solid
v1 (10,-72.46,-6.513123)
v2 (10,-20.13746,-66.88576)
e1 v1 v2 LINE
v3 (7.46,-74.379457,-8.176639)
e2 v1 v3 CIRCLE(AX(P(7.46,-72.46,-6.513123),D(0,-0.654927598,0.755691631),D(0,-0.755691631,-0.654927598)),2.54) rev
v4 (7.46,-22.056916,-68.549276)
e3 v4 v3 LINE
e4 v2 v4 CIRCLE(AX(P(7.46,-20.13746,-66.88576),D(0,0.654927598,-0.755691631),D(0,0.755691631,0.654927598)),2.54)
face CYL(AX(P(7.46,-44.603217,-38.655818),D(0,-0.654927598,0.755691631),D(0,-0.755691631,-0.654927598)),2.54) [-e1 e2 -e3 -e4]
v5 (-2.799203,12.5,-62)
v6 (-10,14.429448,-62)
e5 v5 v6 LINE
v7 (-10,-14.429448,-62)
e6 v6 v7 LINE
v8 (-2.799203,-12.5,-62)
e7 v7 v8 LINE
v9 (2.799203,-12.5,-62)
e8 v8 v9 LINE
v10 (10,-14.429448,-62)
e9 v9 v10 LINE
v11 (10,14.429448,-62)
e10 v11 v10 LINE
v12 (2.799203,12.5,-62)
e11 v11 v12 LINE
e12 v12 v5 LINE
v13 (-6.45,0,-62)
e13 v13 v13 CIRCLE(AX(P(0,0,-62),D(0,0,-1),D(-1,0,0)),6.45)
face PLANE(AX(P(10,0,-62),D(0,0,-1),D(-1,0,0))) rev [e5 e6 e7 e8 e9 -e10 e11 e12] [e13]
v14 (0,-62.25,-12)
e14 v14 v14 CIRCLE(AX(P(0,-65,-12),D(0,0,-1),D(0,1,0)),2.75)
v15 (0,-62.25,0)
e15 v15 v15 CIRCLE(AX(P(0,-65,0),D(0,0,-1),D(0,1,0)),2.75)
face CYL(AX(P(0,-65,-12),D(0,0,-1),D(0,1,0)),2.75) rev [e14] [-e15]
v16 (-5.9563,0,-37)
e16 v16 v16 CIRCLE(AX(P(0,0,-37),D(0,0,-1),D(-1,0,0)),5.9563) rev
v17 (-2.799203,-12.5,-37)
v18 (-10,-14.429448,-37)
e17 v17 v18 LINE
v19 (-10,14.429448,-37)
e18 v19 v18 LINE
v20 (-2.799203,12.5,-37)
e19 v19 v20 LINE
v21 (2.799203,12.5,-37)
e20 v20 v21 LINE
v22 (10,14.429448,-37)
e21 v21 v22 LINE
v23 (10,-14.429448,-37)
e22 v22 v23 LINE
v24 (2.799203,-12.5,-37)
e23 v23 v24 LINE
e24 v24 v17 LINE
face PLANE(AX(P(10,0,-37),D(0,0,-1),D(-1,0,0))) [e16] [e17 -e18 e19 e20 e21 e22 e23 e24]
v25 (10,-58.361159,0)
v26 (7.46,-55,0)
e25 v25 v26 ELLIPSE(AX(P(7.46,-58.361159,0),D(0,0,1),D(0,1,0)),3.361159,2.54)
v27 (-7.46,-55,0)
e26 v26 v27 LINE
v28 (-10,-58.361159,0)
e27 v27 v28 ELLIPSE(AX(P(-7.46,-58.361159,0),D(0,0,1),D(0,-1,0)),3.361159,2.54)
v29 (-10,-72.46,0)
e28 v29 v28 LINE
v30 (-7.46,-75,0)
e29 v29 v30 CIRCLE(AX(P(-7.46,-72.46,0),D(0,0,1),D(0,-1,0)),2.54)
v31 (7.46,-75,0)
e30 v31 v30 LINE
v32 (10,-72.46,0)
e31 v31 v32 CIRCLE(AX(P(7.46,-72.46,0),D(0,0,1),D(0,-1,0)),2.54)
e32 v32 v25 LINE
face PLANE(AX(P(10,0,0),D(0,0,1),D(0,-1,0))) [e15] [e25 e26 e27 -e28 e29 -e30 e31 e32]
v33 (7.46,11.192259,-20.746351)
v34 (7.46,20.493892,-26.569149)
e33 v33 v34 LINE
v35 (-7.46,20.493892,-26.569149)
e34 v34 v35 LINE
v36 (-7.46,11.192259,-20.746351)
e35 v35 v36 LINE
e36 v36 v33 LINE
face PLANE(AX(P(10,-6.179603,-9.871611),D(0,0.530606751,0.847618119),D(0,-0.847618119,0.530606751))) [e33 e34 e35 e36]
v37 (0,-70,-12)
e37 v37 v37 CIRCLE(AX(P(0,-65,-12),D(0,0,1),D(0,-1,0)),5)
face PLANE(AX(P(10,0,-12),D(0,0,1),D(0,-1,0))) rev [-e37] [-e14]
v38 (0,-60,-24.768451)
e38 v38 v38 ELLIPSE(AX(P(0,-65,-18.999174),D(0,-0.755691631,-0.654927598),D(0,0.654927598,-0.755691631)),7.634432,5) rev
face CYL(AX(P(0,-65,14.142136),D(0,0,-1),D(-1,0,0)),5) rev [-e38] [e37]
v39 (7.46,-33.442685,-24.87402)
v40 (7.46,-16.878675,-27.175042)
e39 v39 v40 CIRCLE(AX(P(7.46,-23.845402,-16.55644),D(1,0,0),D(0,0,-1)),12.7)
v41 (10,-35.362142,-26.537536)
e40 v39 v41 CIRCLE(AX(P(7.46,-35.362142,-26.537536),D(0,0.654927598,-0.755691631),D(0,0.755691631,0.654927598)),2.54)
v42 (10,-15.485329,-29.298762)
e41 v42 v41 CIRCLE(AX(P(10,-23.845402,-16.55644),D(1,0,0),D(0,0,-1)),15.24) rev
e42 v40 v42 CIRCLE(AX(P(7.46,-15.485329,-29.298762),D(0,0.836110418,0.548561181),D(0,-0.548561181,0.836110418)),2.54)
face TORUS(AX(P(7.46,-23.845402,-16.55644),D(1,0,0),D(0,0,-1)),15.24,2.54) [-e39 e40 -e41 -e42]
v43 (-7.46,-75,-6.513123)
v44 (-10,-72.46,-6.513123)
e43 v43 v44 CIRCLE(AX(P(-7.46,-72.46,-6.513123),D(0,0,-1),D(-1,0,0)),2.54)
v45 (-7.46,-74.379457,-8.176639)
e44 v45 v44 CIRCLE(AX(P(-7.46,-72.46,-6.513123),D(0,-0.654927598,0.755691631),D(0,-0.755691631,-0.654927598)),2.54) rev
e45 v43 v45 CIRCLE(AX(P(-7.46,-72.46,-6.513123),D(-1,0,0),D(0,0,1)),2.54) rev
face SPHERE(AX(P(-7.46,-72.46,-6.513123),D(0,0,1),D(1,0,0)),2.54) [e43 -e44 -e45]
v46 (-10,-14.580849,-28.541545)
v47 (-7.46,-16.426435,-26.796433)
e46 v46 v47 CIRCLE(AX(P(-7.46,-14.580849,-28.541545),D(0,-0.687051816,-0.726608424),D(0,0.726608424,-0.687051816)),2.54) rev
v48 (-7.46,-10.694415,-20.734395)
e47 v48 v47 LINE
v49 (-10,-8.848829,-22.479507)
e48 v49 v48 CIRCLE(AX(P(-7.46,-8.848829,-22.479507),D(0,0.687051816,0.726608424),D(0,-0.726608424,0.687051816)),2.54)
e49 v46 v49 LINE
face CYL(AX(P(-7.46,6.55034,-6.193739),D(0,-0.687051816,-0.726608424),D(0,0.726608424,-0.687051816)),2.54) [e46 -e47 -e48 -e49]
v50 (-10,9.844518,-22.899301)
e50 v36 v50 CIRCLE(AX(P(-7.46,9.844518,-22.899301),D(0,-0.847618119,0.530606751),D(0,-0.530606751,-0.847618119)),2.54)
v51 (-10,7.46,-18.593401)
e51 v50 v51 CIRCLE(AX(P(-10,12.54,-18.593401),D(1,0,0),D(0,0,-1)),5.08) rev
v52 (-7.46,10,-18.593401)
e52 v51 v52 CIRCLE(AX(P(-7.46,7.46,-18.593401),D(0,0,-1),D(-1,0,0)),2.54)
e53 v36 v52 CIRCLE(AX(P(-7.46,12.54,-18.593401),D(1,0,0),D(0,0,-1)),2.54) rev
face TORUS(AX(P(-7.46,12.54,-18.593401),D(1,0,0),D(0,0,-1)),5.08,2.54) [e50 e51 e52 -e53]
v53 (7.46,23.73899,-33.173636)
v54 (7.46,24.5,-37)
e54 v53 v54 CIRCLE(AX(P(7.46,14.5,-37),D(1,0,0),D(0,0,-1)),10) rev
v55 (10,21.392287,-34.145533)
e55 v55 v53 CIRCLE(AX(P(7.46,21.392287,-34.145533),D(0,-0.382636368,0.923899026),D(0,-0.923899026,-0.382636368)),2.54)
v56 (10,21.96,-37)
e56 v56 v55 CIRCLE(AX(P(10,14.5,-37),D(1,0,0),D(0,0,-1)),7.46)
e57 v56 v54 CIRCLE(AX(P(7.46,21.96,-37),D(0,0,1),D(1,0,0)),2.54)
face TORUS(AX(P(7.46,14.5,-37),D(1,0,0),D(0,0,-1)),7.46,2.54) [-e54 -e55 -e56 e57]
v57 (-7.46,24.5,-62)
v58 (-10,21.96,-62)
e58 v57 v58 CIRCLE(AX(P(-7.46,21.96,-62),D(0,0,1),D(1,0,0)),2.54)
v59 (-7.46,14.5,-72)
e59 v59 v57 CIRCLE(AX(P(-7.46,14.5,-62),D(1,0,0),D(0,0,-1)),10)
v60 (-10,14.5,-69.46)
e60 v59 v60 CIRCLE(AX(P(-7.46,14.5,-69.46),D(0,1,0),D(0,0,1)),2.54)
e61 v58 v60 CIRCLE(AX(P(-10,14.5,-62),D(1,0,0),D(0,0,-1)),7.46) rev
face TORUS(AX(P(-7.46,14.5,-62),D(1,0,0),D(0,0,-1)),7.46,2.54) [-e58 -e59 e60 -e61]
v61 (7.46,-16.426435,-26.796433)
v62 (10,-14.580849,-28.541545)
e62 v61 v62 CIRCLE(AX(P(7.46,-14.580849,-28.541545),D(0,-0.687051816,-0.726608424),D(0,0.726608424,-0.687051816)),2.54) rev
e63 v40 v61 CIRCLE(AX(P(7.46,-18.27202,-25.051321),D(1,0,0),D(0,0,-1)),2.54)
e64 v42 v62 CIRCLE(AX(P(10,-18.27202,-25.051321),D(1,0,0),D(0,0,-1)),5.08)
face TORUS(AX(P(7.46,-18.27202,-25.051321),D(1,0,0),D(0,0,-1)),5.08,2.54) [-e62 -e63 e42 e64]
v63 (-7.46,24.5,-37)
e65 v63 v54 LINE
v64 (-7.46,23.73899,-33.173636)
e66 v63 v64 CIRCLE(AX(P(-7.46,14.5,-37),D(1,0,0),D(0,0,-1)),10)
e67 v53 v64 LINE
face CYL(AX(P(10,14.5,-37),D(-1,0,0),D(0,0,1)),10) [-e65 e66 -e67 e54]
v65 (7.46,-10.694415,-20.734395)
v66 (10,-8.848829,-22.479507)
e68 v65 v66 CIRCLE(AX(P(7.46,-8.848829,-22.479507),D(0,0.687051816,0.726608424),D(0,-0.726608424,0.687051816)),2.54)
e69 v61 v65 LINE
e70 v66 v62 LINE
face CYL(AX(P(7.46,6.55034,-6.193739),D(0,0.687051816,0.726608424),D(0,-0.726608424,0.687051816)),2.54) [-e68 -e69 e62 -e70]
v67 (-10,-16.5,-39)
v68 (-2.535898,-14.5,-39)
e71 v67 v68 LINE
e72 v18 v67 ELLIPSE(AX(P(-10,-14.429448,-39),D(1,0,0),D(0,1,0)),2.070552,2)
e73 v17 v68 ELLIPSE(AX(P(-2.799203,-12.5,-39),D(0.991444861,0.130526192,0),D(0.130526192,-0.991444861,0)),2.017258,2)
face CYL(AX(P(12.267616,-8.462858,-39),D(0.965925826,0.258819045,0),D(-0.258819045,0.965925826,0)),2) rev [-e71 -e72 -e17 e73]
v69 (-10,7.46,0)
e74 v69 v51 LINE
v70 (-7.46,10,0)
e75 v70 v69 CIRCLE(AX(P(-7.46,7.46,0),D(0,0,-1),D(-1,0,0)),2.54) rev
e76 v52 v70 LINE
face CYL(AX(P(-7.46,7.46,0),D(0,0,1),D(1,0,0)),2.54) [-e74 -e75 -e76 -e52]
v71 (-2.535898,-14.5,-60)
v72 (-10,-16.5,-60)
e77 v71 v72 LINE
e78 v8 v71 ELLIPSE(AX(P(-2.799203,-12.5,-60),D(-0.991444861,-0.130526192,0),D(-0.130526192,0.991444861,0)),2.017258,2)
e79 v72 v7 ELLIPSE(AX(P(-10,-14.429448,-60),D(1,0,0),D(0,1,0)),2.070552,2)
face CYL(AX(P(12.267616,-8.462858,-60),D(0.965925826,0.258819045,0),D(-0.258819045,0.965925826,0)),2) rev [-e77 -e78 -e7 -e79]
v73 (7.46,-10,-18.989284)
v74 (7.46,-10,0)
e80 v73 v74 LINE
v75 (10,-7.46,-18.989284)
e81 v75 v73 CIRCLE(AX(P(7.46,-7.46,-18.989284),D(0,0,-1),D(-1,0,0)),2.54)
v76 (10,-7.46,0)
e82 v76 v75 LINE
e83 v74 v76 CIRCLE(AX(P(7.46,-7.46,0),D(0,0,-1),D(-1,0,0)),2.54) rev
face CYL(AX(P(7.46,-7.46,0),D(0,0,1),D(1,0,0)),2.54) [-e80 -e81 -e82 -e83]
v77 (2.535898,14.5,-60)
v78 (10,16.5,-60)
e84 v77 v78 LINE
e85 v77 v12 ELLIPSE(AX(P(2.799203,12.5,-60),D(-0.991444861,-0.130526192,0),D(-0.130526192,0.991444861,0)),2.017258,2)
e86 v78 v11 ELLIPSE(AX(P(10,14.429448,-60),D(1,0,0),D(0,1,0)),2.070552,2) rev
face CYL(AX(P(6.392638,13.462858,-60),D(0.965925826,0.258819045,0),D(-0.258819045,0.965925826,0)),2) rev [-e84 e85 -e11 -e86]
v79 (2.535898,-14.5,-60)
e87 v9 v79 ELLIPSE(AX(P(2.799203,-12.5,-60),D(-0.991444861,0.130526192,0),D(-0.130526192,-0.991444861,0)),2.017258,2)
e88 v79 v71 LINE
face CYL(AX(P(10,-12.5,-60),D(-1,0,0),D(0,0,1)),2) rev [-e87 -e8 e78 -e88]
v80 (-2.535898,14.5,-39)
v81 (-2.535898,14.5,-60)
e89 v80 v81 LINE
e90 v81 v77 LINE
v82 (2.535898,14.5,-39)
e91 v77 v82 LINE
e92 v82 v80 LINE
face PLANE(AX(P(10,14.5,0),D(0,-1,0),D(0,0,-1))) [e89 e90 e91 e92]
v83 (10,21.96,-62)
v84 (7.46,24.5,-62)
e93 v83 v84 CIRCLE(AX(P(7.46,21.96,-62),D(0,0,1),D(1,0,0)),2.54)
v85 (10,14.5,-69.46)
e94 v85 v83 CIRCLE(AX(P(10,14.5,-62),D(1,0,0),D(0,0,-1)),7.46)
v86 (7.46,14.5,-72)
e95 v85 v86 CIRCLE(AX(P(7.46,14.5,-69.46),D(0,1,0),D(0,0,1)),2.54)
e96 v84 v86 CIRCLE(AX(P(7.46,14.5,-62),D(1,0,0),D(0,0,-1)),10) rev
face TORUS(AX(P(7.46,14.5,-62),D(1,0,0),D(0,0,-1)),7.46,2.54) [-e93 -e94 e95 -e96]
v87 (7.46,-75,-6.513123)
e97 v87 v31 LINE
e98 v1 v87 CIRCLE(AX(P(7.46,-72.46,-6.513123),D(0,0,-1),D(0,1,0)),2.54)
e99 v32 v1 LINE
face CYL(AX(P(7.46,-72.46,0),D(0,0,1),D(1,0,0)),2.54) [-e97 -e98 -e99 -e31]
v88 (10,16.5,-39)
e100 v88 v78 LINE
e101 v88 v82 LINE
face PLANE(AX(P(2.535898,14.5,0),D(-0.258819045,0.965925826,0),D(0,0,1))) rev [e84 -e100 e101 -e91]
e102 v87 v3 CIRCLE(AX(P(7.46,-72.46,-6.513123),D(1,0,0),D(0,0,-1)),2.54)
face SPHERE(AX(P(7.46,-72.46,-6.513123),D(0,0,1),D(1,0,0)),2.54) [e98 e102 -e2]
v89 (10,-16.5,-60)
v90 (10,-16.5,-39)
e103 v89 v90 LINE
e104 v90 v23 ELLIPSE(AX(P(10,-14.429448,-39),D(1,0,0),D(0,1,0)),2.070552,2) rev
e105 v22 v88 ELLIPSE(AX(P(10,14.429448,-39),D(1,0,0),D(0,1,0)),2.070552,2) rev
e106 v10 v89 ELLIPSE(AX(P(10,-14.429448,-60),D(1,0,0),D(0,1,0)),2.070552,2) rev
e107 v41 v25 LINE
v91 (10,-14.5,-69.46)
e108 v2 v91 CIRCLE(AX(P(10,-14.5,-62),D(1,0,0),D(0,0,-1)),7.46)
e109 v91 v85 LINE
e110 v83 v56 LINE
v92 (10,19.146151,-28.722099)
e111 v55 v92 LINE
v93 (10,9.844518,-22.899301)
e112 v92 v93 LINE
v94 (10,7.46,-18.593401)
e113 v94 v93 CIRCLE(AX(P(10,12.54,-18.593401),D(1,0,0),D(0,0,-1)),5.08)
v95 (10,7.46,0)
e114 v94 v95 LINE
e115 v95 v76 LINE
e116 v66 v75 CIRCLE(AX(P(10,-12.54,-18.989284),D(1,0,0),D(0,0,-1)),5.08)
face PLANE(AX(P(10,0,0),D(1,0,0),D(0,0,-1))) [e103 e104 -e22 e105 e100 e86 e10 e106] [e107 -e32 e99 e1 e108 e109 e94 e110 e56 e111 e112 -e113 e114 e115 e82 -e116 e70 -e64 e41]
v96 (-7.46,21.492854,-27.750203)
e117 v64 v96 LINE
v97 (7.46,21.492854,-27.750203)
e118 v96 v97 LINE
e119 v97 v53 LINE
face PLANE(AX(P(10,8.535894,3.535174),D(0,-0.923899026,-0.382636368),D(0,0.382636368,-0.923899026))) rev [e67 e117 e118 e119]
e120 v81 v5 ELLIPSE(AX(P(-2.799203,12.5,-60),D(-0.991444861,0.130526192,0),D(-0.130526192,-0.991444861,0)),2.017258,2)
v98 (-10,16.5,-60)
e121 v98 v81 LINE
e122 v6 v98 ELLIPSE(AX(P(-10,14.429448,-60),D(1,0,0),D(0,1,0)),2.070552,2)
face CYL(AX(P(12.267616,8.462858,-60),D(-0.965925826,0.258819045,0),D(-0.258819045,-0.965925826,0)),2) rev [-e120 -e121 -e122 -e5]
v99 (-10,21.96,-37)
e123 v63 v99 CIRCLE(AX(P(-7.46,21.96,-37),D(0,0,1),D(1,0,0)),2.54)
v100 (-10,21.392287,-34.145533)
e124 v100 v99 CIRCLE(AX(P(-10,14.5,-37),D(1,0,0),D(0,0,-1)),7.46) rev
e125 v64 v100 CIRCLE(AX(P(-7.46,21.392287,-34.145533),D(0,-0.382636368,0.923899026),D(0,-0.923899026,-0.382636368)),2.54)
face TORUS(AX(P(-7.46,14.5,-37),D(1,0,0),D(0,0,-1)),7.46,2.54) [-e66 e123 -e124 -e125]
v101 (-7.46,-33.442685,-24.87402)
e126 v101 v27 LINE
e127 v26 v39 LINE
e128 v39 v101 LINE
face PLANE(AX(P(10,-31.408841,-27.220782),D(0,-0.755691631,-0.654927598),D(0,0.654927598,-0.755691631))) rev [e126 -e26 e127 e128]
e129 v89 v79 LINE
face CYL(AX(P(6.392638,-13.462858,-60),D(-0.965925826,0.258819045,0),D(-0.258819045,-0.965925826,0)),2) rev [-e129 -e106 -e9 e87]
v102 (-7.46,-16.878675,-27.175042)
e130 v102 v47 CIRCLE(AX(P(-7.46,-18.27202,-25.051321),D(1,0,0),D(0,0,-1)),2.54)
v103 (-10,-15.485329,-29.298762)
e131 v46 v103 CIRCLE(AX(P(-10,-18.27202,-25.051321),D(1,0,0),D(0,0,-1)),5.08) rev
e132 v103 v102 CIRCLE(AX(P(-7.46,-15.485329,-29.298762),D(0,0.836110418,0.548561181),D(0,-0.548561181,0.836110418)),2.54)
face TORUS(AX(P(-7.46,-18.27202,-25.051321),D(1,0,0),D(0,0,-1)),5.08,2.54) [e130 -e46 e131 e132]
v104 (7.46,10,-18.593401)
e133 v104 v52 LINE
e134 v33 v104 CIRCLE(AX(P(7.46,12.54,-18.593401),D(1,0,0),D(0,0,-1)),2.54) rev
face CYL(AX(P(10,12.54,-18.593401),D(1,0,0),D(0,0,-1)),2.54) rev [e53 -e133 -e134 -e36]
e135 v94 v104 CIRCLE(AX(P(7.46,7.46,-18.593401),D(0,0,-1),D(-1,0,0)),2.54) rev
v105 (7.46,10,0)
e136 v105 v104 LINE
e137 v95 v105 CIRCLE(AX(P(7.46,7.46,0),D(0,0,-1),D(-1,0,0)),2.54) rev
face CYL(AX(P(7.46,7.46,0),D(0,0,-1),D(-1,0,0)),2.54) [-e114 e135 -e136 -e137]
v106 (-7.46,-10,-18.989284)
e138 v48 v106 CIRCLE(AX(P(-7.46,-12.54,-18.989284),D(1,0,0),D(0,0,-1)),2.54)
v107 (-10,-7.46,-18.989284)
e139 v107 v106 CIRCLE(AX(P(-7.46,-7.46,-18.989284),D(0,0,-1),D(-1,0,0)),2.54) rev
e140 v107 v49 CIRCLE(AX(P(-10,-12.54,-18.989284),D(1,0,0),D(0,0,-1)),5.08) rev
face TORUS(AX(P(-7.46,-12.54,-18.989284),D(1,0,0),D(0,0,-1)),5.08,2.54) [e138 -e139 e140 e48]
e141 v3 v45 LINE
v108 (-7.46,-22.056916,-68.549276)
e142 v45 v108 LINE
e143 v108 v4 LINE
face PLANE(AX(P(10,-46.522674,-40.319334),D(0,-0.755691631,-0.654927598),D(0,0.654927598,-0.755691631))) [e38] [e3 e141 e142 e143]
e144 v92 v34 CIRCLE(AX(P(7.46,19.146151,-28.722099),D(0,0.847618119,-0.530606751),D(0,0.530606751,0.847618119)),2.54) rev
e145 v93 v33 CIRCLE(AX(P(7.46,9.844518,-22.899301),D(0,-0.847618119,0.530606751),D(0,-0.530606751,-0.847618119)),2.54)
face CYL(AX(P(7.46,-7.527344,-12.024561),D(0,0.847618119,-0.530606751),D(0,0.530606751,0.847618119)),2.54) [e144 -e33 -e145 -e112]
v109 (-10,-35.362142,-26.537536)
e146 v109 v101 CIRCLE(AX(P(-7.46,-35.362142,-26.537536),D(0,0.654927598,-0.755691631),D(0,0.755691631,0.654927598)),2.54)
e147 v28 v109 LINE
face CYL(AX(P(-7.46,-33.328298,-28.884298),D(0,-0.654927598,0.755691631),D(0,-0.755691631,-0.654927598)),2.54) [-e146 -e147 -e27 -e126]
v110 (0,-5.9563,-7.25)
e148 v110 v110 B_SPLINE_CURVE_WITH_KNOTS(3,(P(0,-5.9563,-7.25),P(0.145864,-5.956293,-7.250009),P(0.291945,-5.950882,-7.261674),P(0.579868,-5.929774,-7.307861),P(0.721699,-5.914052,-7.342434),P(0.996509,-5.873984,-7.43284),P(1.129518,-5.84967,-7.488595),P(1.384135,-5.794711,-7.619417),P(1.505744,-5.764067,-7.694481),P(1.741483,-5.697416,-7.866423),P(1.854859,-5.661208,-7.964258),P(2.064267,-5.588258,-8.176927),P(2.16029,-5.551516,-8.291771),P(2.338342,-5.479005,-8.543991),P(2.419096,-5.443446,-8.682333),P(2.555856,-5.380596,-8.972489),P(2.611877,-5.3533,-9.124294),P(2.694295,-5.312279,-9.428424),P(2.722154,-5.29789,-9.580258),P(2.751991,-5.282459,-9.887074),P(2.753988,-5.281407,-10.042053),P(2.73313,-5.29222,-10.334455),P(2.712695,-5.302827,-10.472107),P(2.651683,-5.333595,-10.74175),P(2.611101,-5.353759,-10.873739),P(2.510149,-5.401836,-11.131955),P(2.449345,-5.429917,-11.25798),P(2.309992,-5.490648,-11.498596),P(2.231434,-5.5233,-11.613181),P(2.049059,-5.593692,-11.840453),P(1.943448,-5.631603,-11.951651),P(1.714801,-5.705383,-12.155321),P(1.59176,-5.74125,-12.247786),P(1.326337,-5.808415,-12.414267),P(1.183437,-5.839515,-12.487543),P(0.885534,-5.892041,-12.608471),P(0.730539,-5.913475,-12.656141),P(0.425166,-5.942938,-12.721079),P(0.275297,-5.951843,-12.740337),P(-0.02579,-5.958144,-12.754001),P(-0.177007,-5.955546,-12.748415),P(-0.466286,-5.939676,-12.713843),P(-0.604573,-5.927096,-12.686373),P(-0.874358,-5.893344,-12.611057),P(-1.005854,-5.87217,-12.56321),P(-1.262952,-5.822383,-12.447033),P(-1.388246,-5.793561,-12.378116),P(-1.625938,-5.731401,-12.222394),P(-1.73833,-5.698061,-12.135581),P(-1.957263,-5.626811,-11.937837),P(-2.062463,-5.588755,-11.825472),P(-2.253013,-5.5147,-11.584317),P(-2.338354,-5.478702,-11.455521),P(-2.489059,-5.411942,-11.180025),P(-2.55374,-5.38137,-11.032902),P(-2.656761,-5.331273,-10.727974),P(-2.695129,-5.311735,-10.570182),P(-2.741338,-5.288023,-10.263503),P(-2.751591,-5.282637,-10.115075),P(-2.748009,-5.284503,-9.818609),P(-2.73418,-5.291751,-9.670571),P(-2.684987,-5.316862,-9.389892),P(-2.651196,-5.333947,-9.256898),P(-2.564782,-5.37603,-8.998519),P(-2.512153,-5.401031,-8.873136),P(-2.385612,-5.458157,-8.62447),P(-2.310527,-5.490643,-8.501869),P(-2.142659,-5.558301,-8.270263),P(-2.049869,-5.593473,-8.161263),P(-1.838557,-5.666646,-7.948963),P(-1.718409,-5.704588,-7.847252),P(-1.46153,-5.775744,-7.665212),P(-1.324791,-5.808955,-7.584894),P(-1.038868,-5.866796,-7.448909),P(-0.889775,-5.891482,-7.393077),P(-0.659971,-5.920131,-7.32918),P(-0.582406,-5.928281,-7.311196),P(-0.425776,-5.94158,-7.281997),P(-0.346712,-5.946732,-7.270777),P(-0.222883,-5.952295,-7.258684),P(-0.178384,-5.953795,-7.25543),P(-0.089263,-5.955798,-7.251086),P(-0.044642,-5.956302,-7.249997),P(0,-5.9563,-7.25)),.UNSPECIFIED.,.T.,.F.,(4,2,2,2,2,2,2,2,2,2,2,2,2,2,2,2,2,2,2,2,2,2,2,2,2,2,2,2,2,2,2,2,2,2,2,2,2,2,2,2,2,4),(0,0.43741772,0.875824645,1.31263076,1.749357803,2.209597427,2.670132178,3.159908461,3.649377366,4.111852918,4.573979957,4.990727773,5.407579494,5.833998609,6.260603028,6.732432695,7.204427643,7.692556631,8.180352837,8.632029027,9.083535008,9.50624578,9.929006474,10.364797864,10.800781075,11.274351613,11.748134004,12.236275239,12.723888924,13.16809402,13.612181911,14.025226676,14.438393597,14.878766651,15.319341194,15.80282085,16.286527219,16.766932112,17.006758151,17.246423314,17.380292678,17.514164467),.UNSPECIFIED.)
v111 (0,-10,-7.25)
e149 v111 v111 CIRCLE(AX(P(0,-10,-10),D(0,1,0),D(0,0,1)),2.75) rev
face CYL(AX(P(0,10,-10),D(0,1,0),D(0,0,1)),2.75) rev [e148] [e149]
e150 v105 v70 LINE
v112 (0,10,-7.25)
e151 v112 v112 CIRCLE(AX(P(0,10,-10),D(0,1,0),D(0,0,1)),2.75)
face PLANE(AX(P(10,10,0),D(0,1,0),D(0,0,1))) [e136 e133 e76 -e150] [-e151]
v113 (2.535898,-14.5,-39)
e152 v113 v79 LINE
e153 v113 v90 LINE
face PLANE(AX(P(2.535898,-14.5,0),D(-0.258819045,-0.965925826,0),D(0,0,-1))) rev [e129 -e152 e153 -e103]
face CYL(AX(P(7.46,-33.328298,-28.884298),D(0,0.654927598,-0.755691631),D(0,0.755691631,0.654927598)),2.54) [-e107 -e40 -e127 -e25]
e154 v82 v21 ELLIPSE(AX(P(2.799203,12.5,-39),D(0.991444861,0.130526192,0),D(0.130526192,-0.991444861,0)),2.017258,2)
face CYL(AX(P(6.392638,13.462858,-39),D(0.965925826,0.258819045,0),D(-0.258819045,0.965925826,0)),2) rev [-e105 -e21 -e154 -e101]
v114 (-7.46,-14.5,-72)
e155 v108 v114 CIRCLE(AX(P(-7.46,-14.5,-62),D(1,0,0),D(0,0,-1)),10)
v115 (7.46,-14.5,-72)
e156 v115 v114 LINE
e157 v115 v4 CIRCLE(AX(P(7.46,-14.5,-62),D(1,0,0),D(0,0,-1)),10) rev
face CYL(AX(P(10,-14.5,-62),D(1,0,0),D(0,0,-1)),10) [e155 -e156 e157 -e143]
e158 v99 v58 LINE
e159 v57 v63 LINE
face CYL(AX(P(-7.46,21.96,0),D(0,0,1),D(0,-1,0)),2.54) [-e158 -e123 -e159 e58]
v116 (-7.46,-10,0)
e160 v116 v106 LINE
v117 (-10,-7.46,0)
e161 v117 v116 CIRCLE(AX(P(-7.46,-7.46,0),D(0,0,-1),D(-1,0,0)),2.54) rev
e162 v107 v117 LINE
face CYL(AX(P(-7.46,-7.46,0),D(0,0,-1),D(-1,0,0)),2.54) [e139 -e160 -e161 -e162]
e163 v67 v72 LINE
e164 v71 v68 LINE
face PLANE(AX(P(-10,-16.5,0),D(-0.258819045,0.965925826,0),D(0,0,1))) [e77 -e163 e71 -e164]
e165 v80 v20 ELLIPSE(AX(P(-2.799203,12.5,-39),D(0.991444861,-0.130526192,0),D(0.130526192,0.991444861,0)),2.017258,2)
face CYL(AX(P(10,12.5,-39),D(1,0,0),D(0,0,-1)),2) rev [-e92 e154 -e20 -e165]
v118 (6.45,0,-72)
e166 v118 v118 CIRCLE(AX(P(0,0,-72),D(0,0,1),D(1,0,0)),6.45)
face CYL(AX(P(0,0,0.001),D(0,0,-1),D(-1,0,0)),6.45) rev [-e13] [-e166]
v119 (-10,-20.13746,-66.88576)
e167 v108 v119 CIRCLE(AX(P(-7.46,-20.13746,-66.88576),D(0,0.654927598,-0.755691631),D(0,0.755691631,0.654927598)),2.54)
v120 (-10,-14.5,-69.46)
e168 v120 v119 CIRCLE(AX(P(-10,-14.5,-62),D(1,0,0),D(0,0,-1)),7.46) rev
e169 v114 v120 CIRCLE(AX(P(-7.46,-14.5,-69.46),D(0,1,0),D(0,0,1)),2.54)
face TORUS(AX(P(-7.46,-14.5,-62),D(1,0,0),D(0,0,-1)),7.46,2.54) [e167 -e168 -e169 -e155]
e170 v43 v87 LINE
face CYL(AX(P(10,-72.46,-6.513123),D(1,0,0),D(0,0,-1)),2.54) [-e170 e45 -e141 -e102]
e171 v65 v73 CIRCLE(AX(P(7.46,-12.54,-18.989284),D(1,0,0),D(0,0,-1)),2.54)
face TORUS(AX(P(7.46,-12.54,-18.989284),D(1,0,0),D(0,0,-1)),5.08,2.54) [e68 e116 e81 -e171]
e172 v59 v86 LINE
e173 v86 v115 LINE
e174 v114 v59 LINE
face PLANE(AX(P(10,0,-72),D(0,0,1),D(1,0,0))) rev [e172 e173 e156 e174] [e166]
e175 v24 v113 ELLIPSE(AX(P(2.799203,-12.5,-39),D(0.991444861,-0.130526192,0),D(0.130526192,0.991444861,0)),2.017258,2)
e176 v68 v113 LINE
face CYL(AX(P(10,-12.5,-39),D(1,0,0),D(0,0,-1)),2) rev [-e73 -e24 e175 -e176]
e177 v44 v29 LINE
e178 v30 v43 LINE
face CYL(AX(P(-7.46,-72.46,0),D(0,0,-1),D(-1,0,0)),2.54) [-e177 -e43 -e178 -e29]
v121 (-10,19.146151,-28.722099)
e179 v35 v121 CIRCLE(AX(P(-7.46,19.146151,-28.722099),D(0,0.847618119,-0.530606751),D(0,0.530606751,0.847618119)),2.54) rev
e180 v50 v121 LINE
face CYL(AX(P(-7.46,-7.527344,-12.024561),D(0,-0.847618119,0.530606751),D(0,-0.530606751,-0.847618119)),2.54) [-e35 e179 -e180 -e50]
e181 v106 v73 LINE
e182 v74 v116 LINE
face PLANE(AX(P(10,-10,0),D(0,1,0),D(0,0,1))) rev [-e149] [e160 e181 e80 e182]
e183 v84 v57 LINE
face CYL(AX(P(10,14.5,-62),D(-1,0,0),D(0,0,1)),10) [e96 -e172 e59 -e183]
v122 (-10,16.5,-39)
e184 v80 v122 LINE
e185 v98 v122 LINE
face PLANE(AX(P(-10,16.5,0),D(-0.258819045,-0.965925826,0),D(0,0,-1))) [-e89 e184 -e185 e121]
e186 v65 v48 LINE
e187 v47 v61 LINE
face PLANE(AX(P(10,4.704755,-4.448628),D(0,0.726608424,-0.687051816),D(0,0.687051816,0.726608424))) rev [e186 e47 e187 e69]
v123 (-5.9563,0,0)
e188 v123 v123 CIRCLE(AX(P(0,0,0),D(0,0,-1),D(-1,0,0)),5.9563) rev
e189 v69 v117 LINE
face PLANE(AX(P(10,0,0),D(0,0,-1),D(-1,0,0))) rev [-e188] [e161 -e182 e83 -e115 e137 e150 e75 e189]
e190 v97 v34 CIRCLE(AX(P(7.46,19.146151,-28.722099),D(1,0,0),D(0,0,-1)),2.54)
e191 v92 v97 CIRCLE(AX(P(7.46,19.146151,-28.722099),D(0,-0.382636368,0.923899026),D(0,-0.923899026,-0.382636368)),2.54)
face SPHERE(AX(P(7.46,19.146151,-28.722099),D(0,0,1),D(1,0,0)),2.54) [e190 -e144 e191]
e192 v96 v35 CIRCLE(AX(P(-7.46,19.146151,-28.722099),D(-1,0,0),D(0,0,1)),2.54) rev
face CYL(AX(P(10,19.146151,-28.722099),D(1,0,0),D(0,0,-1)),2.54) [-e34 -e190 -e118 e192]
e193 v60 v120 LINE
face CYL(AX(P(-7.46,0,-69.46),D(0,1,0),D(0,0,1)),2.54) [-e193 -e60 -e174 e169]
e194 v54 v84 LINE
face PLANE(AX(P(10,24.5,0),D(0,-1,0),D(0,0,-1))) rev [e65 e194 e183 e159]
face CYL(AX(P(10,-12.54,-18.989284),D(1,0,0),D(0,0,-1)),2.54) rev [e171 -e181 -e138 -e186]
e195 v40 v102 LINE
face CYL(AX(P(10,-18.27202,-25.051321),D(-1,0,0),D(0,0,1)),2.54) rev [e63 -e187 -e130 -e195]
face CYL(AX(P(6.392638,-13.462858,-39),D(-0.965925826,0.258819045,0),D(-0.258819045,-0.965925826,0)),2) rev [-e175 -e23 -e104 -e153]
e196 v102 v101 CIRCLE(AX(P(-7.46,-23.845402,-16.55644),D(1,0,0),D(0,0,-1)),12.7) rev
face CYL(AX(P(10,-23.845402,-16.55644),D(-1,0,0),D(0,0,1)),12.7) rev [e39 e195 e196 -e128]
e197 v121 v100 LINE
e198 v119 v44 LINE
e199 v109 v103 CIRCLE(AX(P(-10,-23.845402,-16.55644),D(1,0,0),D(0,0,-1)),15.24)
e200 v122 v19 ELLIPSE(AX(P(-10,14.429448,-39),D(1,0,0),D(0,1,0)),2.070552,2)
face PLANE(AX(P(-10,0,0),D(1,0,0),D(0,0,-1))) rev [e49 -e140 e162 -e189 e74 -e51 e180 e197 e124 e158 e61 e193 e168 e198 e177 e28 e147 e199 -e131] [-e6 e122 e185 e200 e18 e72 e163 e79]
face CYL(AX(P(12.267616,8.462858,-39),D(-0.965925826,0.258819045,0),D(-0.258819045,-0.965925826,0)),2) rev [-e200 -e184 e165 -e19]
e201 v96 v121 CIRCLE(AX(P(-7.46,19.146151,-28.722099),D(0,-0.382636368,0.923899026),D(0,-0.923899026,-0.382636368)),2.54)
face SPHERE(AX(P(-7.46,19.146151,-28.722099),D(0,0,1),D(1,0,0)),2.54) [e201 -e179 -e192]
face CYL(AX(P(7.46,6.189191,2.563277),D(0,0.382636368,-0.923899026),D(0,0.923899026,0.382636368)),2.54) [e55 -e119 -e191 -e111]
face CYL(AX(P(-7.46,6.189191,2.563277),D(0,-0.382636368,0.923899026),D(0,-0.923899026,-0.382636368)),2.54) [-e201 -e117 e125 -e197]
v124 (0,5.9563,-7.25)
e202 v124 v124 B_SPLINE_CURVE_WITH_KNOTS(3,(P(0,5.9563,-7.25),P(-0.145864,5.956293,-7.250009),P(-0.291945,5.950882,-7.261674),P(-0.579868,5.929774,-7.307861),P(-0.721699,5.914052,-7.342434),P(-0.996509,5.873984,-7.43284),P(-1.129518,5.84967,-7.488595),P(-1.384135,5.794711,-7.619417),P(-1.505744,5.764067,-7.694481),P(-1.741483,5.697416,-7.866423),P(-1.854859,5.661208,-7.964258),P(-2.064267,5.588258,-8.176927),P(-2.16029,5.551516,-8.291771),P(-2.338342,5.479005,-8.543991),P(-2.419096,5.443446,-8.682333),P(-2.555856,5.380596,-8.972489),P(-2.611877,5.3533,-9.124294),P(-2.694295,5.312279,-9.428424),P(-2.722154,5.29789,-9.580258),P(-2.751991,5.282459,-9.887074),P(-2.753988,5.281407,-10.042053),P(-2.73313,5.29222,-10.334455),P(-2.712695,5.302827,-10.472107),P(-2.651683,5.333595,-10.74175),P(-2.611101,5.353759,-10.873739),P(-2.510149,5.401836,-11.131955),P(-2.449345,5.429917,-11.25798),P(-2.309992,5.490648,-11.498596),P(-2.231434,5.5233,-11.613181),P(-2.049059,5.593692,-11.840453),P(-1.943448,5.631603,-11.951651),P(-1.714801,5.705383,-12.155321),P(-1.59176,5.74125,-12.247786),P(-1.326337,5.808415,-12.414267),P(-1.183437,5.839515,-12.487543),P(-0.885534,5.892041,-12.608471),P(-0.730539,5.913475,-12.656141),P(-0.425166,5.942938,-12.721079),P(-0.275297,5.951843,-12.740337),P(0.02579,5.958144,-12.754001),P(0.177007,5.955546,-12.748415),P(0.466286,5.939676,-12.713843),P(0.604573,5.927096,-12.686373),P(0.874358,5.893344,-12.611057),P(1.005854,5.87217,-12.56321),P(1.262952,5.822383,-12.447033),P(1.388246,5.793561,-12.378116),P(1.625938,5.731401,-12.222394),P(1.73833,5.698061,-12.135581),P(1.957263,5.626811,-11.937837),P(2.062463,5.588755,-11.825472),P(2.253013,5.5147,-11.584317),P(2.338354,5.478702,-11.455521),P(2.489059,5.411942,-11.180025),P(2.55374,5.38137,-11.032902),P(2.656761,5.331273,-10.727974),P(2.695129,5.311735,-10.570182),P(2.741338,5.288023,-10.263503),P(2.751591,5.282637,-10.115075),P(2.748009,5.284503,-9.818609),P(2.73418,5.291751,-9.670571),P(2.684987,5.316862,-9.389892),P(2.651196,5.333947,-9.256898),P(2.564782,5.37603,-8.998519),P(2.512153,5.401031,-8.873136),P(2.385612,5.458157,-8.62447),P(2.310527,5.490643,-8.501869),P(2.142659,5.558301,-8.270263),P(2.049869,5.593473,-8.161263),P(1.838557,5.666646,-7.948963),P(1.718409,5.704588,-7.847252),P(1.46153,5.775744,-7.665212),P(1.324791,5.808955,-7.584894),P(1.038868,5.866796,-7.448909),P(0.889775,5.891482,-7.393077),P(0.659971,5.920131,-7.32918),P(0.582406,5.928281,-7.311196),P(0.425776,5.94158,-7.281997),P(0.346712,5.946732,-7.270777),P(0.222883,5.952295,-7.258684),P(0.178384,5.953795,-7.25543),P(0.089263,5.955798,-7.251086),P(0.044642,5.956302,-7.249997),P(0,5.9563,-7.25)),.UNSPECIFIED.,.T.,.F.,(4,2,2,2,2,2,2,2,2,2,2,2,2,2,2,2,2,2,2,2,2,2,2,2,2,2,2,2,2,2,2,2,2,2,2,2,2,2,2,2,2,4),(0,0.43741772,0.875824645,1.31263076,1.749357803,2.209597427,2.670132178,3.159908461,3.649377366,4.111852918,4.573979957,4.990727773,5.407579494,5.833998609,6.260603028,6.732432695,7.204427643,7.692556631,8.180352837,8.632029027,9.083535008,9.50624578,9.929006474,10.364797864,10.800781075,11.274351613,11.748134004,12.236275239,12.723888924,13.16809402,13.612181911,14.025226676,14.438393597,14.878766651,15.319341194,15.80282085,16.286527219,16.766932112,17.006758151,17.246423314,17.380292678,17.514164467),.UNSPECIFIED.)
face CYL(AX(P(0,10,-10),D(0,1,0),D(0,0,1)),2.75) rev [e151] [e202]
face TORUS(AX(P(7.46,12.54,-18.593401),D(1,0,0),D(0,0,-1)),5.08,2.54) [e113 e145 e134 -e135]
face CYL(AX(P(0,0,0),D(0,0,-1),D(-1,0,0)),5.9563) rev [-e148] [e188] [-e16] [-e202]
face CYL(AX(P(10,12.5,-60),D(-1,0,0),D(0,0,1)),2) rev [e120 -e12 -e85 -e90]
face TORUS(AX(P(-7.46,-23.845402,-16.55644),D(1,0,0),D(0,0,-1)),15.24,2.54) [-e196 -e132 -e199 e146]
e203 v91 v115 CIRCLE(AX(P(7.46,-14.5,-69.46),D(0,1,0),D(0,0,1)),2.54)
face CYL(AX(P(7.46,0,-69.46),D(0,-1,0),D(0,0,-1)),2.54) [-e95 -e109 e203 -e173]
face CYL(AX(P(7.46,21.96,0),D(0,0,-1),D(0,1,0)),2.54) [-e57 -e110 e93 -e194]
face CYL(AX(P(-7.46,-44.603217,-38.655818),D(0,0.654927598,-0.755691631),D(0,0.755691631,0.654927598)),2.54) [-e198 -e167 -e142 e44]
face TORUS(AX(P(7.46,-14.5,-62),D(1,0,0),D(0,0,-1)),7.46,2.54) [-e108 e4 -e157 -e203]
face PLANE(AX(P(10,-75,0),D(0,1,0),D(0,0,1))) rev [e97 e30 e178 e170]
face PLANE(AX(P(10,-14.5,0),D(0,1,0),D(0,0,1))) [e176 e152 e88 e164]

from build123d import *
from OCP.BRepFilletAPI import BRepFilletAPI_MakeChamfer

# Parameters (mm, degrees)
SKETCH1_W                    = 25
SKETCH1_H                    = 29
BOSS_EXTRUDE1_DEPTH          = 10
SKETCH6_R                    = 5.9563
CUT_EXTRUDE1_DEPTH           = 113.716458426
CUT_EXTRUDE3_REACH           = 107.891
SKETCH14_R                   = 6.45
M5_START                     = -10
M5_CLEARANCE_HOLE1_OUTLINE_R = 2.75
M5_CLEARANCE_HOLE1_DEPTH     = 20
CUT_EXTRUDE2_DEPTH           = 18
M5_CLEARANCE_HOLE2_D         = 5.5
FILLET14_R                   = 12.7
FILLET13_R                   = 10
FILLET16_R                   = 2.54
CHAMFER1_SIZE                = 2
CHAMFER1_SIZE2               = 7.464101615
CHAMFER2_SIZE                = 2
CHAMFER2_SIZE2               = 7.464101615
FILLET17_R                   = 2


# Read off the part's stored shape, not the designer's step: M5 Clearance Hole1
with BuildPart() as part:
    # Sketch1 → Boss-Extrude1 (new, symmetric)
    with BuildSketch(Plane(origin=(0, 0, 0), x_dir=(0, 0, -1), z_dir=(1, 0, 0))):
        Polygon((7.460622198, -75), (72, -19.066312341), (72, 24.5), (35.01114111, 24.5), (27, 21.182154811), (20, 10), (0, 10), (0, -10), (20, -10), (27, -16.618919561), (40.474722748, -19.922182745), (0, -55), (0, -75), align=None)
        with Locations((49.5, 0)):
            Rectangle(SKETCH1_W, SKETCH1_H, mode=Mode.SUBTRACT)
    extrude(amount=BOSS_EXTRUDE1_DEPTH, both=True)

    # Sketch6 → Cut-Extrude1 (cut, through all)
    with BuildSketch(Plane(origin=(0, -81.5, -37), x_dir=(1, 0, 0), z_dir=(0, 0, 1))):
        with Locations(Location((0, 81.5, 0), (0, 0, 180))):
            Circle(SKETCH6_R)
    extrude(amount=CUT_EXTRUDE1_DEPTH, mode=Mode.SUBTRACT)

    # Sketch14 → Cut-Extrude3 (cut, up to next)
    with BuildSketch(Plane(origin=(0, -52.5, -72), x_dir=(1, 0, 0), z_dir=(0, 0, 1)), mode=Mode.PRIVATE) as cut_extrude3_sk1:
        with Locations(Location((0, 52.5, 0), (0, 0, 180))):
            Circle(SKETCH14_R)
    cut_extrude3_tool1 = extrude(cut_extrude3_sk1.sketch, amount=CUT_EXTRUDE3_REACH, mode=Mode.PRIVATE) & part.part
    add(cut_extrude3_tool1.solids().sort_by_distance((0, 0, -72))[0], mode=Mode.SUBTRACT)

    # M5 Clearance Hole1 outline → M5 Clearance Hole1 (cut)
    with BuildSketch(Plane(origin=(0, 0, 0), x_dir=(1, 0, 0), z_dir=(0, 1, 0)).offset(M5_START)):
        with Locations((0, 10)):
            Circle(M5_CLEARANCE_HOLE1_OUTLINE_R)
    extrude(amount=M5_CLEARANCE_HOLE1_DEPTH, mode=Mode.SUBTRACT)

    # Sketch10 → Cut-Extrude2 (cut)
    with BuildSketch(Plane.XY.offset(-30)):
        with BuildLine():
            ThreePointArc((5, -65), (3.535533906, -61.464466094), (0, -60))
            Line((0, -60), (0, -70))
            ThreePointArc((0, -70), (3.535533906, -68.535533906), (5, -65))
        make_face()
        with BuildLine():
            Line((0, -70), (0, -60))
            ThreePointArc((0, -60), (-5, -65), (0, -70))
        make_face()
    extrude(amount=CUT_EXTRUDE2_DEPTH, mode=Mode.SUBTRACT)

    # M5 Clearance Hole2 (through all)
    with Locations(Plane(origin=(0, 0, -12), x_dir=(-1, 0, 0), z_dir=(0, 0, -1))):
        with Locations((0, -65)):
            Hole(M5_CLEARANCE_HOLE2_D / 2)

    # Fillet14
    # the kernel refuses this fillet: 12.7 mm, written as the material it adds along each edge
    with BuildSketch(Plane(origin=(-10, -19.922182745, -40.474722748), x_dir=(0, 0.23809523809523664, 0.9712418121129117), z_dir=(1, 0, 0))) as fillet14_piece_1:
        with BuildLine():
            CenterArc((22.296336967, 9.505223671), FILLET14_R, 144.688307267, 83.767361366)
            Line((11.932887465, 16.846130592), (11.725618475, 16.992948731))
            Line((11.725618475, 16.992948731), (-0.20726899, 0.146818138))
            Line((-0.20726899, 0.146818138), (0, -0.254))
            ThreePointArc((0, -0.254), (6.936852687, -0.254), (13.705252742, -0.190104473))
            Line((13.705252742, -0.190104473), (13.873705374, 0))
        make_face()
    extrude(amount=20)

    # Fillet13
    fillet13_edges = [part.edges().sort_by_distance(p)[0] for p in [
        (0, 24.5, -35.01114111),
        (0, 24.5, -72),
        (0, -19.066312341, -72),
    ]]
    fillet(fillet13_edges, radius=FILLET13_R)

    # Fillet16
    fillet16_edges = [part.edges().sort_by_distance(p)[0] for p in [
        (10, -48.528458156, -38.004949088),
        (10, 0, -72),
        (10, -18.653747718, -71.096503718),
        (10, 21.571067812, -69.071067812),
        (10, 24.307902492, -35.049346594),
        (-10, 10, -10),
        (-10, 15.591077405, -23.5),
        (-10, -75, -3.730311099),
        (-10, -13.30945978, -23.5),
        (-10, -10, -10),
        (10, -10, -10),
        (10, -13.30945978, -23.5),
        (0, 10, -20),
        (0, 21.182154811, -27),
        (0, -75, -7.460622198),
        (0, -16.618919561, -27),
        (0, -10, -20),
        (10, -75, -3.730311099),
        (10, 15.591077405, -23.5),
        (10, 10, -10),
        (-10, -44.221342733, -12.437010014),
        (10, -44.221342733, -12.437010014),
        (-10, -25.437608609, -29.156236253),
        (10, -25.437608609, -29.156236253),
        (-10, 22.460572534, -30.08681816),
        (10, 22.460572534, -30.08681816),
        (-10, 24.5, -49.5),
        (-10, 0, -72),
        (-10, -48.528458156, -38.004949088),
        (-10, -18.653747718, -71.096503718),
        (-10, 21.571067812, -69.071067812),
        (-10, 24.307902492, -35.049346594),
        (10, 24.5, -49.5),
    ]]
    fillet(fillet16_edges, radius=FILLET16_R)

    # Chamfer1: one chamfer whose edges measure the first distance from different faces: ONE call of the kernel's chamfer builder (chamfer() names one face for all edges)
    chamfer1_edges_1 = [part.edges().sort_by_distance(p)[0] for p in [
        (10, 14.5, -49.5),
    ]]
    chamfer1_side_1 = [part.faces().sort_by_distance(p)[0] for p in [
        (10, -18.267082867, -33.779126771),
    ]]
    chamfer1_edges_2 = [part.edges().sort_by_distance(p)[0] for p in [
        (-10, 14.5, -49.5),
    ]]
    chamfer1_side_2 = [part.faces().sort_by_distance(p)[0] for p in [
        (-10, -18.267082867, -33.779126771),
    ]]
    chamfer1 = BRepFilletAPI_MakeChamfer(part.part.solid().wrapped)
    for e in chamfer1_edges_1:
        chamfer1.Add(CHAMFER1_SIZE, CHAMFER1_SIZE2, e.wrapped, chamfer1_side_1[0].wrapped)  # the first distance lies on this face
    for e in chamfer1_edges_2:
        chamfer1.Add(CHAMFER1_SIZE, CHAMFER1_SIZE2, e.wrapped, chamfer1_side_2[0].wrapped)  # the first distance lies on this face
    add(Compound.cast(chamfer1.Shape()), mode=Mode.REPLACE)

    # Chamfer2: one chamfer whose edges measure the first distance from different faces: ONE call of the kernel's chamfer builder (chamfer() names one face for all edges)
    chamfer2_edges_1 = [part.edges().sort_by_distance(p)[0] for p in [
        (-10, -14.5, -49.5),
    ]]
    chamfer2_side_1 = [part.faces().sort_by_distance(p)[0] for p in [
        (-10, -18.927449514, -33.471681192),
    ]]
    chamfer2_edges_2 = [part.edges().sort_by_distance(p)[0] for p in [
        (10, -14.5, -49.5),
    ]]
    chamfer2_side_2 = [part.faces().sort_by_distance(p)[0] for p in [
        (10, -18.927449514, -33.471681192),
    ]]
    chamfer2 = BRepFilletAPI_MakeChamfer(part.part.solid().wrapped)
    for e in chamfer2_edges_1:
        chamfer2.Add(CHAMFER2_SIZE, CHAMFER2_SIZE2, e.wrapped, chamfer2_side_1[0].wrapped)  # the first distance lies on this face
    for e in chamfer2_edges_2:
        chamfer2.Add(CHAMFER2_SIZE, CHAMFER2_SIZE2, e.wrapped, chamfer2_side_2[0].wrapped)  # the first distance lies on this face
    add(Compound.cast(chamfer2.Shape()), mode=Mode.REPLACE)

    # Fillet17
    fillet17_edges = [part.edges().sort_by_distance(p)[0] for p in [
        (0, 14.5, -62),
        (0, 14.5, -37),
        (6.267949192, 15.5, -37),
        (6.267949192, 15.5, -62),
        (-6.267949192, 15.5, -37),
        (-6.267949192, 15.5, -62),
        (0, -14.5, -37),
        (0, -14.5, -62),
        (-6.267949192, -15.5, -62),
        (-6.267949192, -15.5, -37),
        (6.267949192, -15.5, -62),
        (6.267949192, -15.5, -37),
    ]]
    fillet(fillet17_edges, radius=FILLET17_R)


solid = part.part
